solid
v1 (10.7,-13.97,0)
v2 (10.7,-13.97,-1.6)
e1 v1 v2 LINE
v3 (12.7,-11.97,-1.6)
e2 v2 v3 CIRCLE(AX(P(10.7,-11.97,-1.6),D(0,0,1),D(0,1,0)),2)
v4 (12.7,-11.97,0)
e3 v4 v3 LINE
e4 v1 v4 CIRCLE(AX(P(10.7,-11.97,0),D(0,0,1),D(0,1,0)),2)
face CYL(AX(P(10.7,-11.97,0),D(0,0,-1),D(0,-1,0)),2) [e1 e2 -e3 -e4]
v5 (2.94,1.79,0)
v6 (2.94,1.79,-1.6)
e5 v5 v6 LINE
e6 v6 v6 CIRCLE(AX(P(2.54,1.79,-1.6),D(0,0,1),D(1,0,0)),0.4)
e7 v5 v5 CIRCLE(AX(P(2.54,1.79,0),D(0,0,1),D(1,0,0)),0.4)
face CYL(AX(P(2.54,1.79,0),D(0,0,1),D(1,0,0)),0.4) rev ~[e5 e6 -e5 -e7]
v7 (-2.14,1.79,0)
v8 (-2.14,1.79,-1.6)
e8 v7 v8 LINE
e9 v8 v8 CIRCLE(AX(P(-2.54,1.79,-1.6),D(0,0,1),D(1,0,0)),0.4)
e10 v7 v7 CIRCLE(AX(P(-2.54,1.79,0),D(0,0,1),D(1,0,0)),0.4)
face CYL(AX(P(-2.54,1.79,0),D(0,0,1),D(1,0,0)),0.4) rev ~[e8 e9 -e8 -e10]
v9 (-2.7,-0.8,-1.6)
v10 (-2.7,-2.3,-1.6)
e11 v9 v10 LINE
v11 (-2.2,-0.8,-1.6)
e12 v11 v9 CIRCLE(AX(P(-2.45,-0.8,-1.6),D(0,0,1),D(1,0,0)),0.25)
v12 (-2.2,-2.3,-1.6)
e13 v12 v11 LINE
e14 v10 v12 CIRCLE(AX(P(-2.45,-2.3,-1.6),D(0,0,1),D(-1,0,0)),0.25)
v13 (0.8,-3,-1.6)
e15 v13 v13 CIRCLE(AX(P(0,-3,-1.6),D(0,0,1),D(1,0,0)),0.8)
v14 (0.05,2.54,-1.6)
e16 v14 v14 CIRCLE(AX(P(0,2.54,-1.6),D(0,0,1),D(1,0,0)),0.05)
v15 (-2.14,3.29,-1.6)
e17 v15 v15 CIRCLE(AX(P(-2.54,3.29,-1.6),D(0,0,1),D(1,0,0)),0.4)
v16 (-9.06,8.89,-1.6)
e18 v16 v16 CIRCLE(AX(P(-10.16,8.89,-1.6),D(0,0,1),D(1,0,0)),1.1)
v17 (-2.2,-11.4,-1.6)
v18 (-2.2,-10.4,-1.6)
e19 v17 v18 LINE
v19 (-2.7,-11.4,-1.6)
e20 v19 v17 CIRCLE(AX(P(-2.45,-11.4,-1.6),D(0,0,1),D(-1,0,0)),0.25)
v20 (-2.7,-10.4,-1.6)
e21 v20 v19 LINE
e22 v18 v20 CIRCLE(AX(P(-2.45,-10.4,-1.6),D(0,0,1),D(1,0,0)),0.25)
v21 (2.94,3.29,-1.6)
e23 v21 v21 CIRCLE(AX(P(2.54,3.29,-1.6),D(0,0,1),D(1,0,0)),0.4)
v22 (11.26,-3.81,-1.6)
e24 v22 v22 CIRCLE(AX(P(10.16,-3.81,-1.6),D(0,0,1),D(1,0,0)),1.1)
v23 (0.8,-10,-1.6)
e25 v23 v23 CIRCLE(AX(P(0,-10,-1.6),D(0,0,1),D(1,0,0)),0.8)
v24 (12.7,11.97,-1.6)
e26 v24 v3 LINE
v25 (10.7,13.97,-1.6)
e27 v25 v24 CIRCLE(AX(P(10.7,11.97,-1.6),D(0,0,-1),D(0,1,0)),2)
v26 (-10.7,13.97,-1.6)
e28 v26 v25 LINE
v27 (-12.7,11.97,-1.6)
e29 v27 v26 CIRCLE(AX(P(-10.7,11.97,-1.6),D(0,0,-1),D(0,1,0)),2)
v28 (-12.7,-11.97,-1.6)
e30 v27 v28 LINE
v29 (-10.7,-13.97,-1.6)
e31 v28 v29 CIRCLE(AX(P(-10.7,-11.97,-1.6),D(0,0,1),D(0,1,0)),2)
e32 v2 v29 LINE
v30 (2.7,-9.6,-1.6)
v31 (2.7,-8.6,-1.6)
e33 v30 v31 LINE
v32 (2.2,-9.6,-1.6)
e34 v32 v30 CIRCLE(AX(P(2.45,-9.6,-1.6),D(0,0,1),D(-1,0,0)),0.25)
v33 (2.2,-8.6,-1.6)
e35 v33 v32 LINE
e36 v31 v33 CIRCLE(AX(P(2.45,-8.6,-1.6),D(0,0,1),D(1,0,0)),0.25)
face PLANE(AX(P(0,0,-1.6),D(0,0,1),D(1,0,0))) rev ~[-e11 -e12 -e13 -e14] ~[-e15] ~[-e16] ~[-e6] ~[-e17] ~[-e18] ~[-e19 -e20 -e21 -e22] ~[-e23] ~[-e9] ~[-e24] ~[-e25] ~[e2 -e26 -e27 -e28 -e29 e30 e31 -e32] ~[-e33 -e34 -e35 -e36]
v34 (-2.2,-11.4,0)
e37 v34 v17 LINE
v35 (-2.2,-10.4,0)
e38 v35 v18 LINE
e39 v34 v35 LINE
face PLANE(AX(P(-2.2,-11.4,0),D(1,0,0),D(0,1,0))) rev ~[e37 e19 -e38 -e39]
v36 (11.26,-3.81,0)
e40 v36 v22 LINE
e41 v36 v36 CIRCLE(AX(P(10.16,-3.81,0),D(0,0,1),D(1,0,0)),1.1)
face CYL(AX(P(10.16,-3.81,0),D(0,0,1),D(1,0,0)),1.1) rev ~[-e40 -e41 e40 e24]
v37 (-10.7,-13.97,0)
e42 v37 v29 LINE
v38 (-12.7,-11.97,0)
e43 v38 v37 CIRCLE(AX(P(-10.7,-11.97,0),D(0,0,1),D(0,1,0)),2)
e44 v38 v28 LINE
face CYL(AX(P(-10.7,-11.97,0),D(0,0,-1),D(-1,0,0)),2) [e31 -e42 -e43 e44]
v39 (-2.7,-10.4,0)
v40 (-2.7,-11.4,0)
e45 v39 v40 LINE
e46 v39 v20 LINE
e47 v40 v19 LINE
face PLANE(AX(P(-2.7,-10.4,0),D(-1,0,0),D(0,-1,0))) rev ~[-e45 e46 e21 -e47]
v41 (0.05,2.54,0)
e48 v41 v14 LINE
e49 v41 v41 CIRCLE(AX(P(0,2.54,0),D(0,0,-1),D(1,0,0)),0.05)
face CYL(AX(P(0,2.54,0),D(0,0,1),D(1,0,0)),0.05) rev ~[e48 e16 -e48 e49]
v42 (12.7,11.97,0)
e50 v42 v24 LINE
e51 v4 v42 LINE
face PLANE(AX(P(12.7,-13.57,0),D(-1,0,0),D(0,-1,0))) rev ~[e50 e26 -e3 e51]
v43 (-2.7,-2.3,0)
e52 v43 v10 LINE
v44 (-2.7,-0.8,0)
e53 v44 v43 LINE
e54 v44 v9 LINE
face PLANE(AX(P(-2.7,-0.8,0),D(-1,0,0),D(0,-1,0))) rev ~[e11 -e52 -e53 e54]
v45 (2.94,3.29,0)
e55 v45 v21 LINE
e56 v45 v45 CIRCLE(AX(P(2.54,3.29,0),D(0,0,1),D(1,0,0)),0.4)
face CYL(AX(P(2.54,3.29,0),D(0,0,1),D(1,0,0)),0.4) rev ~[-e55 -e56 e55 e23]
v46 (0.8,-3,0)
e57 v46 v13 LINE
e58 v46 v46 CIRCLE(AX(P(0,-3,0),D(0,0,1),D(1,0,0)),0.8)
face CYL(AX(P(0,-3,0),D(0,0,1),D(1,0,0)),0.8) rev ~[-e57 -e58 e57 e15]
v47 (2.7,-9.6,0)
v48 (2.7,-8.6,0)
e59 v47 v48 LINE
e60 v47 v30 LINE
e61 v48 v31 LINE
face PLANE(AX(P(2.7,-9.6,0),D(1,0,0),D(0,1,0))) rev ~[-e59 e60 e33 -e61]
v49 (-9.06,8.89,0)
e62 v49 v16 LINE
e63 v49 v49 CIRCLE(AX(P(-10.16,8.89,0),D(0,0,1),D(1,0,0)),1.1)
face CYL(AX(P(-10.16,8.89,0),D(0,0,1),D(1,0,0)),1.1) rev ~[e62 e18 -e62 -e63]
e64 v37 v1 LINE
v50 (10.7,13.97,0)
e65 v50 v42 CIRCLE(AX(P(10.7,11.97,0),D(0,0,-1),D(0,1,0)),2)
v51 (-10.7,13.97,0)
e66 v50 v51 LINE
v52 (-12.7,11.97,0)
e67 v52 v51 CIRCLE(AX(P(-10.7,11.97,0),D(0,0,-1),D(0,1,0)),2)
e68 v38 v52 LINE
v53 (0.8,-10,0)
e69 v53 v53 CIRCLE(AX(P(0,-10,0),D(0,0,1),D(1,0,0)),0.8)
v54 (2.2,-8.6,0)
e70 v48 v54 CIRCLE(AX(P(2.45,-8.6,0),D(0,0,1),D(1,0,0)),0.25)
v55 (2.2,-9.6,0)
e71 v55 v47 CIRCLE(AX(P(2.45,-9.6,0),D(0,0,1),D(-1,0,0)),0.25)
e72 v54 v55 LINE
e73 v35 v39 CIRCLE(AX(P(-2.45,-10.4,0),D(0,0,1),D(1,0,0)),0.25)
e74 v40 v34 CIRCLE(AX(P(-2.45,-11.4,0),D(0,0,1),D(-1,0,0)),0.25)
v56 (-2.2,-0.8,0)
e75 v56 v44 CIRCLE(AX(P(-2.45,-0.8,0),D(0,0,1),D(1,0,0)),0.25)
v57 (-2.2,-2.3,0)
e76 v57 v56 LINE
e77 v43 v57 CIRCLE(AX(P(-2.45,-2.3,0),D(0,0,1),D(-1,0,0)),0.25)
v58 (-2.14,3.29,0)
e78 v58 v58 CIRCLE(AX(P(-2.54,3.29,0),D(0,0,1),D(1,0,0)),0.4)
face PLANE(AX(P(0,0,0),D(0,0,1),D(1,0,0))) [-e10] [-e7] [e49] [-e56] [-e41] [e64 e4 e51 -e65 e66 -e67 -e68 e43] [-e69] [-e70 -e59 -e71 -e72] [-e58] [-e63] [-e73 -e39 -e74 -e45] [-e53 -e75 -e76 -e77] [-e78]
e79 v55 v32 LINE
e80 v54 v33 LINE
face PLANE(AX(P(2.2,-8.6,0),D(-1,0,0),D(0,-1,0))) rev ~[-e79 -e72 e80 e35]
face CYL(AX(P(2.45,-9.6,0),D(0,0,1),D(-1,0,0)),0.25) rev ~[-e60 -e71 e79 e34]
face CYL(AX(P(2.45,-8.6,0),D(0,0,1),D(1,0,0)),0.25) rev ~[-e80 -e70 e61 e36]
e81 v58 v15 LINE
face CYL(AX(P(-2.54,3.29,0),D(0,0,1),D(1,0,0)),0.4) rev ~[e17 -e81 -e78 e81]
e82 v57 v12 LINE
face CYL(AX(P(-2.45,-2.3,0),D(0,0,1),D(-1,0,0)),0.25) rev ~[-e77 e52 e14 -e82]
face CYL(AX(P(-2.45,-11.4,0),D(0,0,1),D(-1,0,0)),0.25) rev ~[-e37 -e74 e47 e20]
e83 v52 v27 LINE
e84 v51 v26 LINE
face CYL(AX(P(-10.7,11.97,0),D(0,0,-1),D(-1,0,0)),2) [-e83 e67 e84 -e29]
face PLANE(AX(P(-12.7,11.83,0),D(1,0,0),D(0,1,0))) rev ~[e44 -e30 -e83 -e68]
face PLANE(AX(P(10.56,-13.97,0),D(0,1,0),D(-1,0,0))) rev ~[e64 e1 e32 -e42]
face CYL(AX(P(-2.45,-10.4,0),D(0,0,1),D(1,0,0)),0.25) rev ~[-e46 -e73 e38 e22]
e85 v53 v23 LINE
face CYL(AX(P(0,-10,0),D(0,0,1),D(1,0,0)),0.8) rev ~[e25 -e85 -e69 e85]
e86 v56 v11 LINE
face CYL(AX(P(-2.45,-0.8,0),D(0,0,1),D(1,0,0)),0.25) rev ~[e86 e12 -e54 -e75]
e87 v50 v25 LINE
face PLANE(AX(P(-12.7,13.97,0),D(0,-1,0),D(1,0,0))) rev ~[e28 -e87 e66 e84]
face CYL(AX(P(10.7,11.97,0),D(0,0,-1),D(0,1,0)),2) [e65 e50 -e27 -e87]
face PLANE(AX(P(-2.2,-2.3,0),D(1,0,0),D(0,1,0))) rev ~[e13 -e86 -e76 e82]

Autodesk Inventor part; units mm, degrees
ref_plane "YZ Plane" through (0, 0, 0) normal (1, 0, 0) x (0, 1, 0)
ref_plane "XZ Plane" through (0, 0, 0) normal (0, 1, 0) x (-1, 0, 0)
ref_plane "XY Plane" through (0, 0, 0) normal (0, 0, 1) x (1, 0, 0)
ref_plane "作業平面1" through (0, 0, 0) normal (0, 0, 1) x (1, 0, 0)
sketch "スケッチ1" plane through (0, 0, 0) normal (0, 0, 1) x (1, 0, 0)
  line L0 (-12.7, 11.83) -> (-12.7, 13.57) projected
  line L1 (-12.3, 13.97) -> (-10.56, 13.97) projected
  line L2 (12.3, -13.97) -> (10.56, -13.97) projected
  line L3 (12.7, -11.83) -> (12.7, -13.57) projected
  line L4 (-12.7, 13.97) -> (12.7, 13.97)
  line L5 (12.7, 13.97) -> (12.7, -13.97)
  line L6 (12.7, -13.97) -> (-12.7, -13.97)
  line L7 (-12.7, -13.97) -> (-12.7, 13.97)
  point P0 (0, 0)
extrude "押し出し1" add sketch "スケッチ1" against normal blind 1.6
sketch "スケッチ2" plane through (0, 0, 0) normal (0, 0, 1) x (1, 0, 0)
  circle A0 centre (-10.16, 8.89) radius 1.1
  circle A1 centre (10.16, -3.81) radius 1.1
  point P0 (0, 0)
  dimension "d2" = 2.2
  dimension "d3" = 2.2
  dimension "d4" = 10.16
  dimension "d5" = 8.89
  dimension "d6" = 3.81
  dimension "d7" = 10.16
extrude "押し出し2" cut sketch "スケッチ2" along normal mid plane 20
sketch "スケッチ3" plane through (0, 0, 0) normal (0, 0, 1) x (1, 0, 0)
  circle A0 centre (-2.54, 3.81) radius 0.4 projected
  circle A1 centre (-2.54, 1.27) radius 0.4 projected
  circle A2 centre (2.54, 3.81) radius 0.4 projected
  circle A3 centre (2.54, 1.27) radius 0.4 projected
  point P0 (0, 0)
extrude "押し出し3" cut sketch "スケッチ3" along normal mid plane 20
sketch "スケッチ4" plane through (0, 0, 0) normal (0, 0, 1) x (1, 0, 0)
  circle A0 centre (-2.54, 1.27) radius 0.4 projected
  circle A1 centre (-2.54, 3.81) radius 0.4 projected
  circle A2 centre (2.54, 1.27) radius 0.4 projected
  circle A3 centre (2.54, 3.81) radius 0.4 projected
  circle A4 centre (0, 2.54) radius 0.05
  line L0 (0, -30.1689) -> (0, 24.3248)
  point P0 (0, 0)
  dimension "d12" = 0.1
  dimension "d13" = 2.54
extrude "押し出し4" cut sketch "スケッチ4" against normal blind 20 contours A4 L0 | L0 A4
sketch "スケッチ5" plane through (0, 0, 0) normal (0, 0, 1) x (1, 0, 0)
  circle A0 centre (0, -3) radius 0.8
  circle A1 centre (0, -10) radius 0.8
  point P0 (0, 0)
  dimension "d16" = 1.6
  dimension "d17" = 1.6
  dimension "d18" = 3
  dimension "d19" = 7
extrude "押し出し5" cut sketch "スケッチ5" against normal blind 20
sketch "スケッチ6" plane through (0, 0, 0) normal (0, 0, 1) x (1, 0, 0)
  line L0 (-2.55, -1.3) -> (-2.35, -1.3) projected
  line L1 (-2.55, -1.3) -> (-2.55, -1.8) projected
  line L2 (-2.35, -1.8) -> (-2.55, -1.8) projected
  line L3 (-2.35, -1.8) -> (-2.35, -1.3) projected
  line L4 (2.55, -8.6) -> (2.55, -9.6) projected
  line L5 (2.35, -9.6) -> (2.35, -8.6) projected
  line L6 (-2.35, -10.4) -> (-2.35, -11.4) projected
  circle A0 centre (0, -3) radius 0.8 projected
  circle A1 centre (0, -10) radius 0.8 projected
  circle A2 centre (0, 2.54) radius 0.05 projected
  circle A3 centre (2.54, 3.81) radius 0.4 projected
  circle A4 centre (-2.54, 3.81) radius 0.4 projected
  circle A5 centre (-2.54, 1.27) radius 0.4 projected
  circle A6 centre (2.54, 1.27) radius 0.4 projected
  circle A7 centre (-10.16, 8.89) radius 1.1 projected
  circle A8 centre (10.16, -3.81) radius 1.1 projected
  line L7 (-12.7, 13.97) -> (12.7, 13.97) projected
  line L8 (-12.7, -13.97) -> (-12.7, 13.97) projected
  line L9 (12.7, -13.97) -> (-12.7, -13.97) projected
  line L10 (12.7, 13.97) -> (12.7, -13.97) projected
  line L11 (-2.55, -11.4) -> (-2.55, -10.4) projected
  line L12 (-2.35, -1.8) -> (-2.35, -2.3) projected
  line L13 (-2.55, -2.3) -> (-2.55, -1.8) projected
  line L14 (-2.35, -0.8) -> (-2.35, -1.3) projected
  line L15 (-2.55, -1.3) -> (-2.55, -0.8) projected
  line L16 (-2.55, -1.3) -> (-2.35, -1.8)
  line L17 (2.35, -8.6) -> (2.55, -9.6)
  line L18 (-2.55, -10.4) -> (-2.35, -11.4)
  line L19 (-2.55, -0.8) -> (-2.35, -0.8)
  line L20 (-2.55, -2.3) -> (-2.35, -2.3)
  line L21 (2.35, -8.6) -> (2.55, -8.6)
  line L22 (2.55, -9.6) -> (2.35, -9.6)
  line L23 (-2.55, -10.4) -> (-2.35, -10.4)
  line L24 (-2.55, -11.4) -> (-2.35, -11.4)
  line L25 (-2.45, -2.3) -> (-2.45, -0.8) construction
  line L26 (-2.2, -2.3) -> (-2.2, -0.8)
  line L27 (-2.7, -0.8) -> (-2.7, -2.3)
  arc A9 (-2.7, -2.3) -> (-2.2, -2.3) centre (-2.45, -2.3) ccw
  arc A10 (-2.2, -0.8) -> (-2.7, -0.8) centre (-2.45, -0.8) ccw
  line L28 (2.45, -9.6) -> (2.45, -8.6) construction
  line L29 (2.7, -9.6) -> (2.7, -8.6)
  line L30 (2.2, -8.6) -> (2.2, -9.6)
  arc A11 (2.2, -9.6) -> (2.7, -9.6) centre (2.45, -9.6) ccw
  arc A12 (2.7, -8.6) -> (2.2, -8.6) centre (2.45, -8.6) ccw
  line L31 (-2.45, -11.4) -> (-2.45, -10.4) construction
  line L32 (-2.2, -11.4) -> (-2.2, -10.4)
  line L33 (-2.7, -10.4) -> (-2.7, -11.4)
  arc A13 (-2.7, -11.4) -> (-2.2, -11.4) centre (-2.45, -11.4) ccw
  arc A14 (-2.2, -10.4) -> (-2.7, -10.4) centre (-2.45, -10.4) ccw
  point P0 (0, 0)
  point P1 (-2.45, -1.55)
  point P2 (2.45, -9.1)
  point P3 (-2.45, -10.9)
  dimension "d22" = 0.2
  dimension "d23" = 0.5
  dimension "d24" = 0.5
  dimension "d25" = 0.5
extrude "押し出し6" cut sketch "スケッチ6" against normal blind 2 contours L15 L19 L14 L0 | L16 L2 L1 | L0 L3 L16 | L2 L12 L20 L13 | L4 L17 L21 | L22 L5 L17 | L6 L18 L23 | L24 L11 L18 | A9 L27 A10 L26 | A11 L30 A12 L29 | A13 L33 A14 L32
fillet "フィレット1" radius 2 4 edges at (-12.7, -13.97, -0.8) (12.7, -13.97, -0.8) (12.7, 13.97, -0.8) (-12.7, 13.97, -0.8)
move faces "移動1" translate (0, 0.52, 0) faces at (-2.1452, 1.2058, -0.5333) (2.9348, 1.2058, -0.5333)
move faces "移動2" translate (0, -0.52, 0) faces at (-2.1452, 3.7458, -0.5333) (2.9348, 3.7458, -0.5333)
properties part number "HbSensorBoard01"
